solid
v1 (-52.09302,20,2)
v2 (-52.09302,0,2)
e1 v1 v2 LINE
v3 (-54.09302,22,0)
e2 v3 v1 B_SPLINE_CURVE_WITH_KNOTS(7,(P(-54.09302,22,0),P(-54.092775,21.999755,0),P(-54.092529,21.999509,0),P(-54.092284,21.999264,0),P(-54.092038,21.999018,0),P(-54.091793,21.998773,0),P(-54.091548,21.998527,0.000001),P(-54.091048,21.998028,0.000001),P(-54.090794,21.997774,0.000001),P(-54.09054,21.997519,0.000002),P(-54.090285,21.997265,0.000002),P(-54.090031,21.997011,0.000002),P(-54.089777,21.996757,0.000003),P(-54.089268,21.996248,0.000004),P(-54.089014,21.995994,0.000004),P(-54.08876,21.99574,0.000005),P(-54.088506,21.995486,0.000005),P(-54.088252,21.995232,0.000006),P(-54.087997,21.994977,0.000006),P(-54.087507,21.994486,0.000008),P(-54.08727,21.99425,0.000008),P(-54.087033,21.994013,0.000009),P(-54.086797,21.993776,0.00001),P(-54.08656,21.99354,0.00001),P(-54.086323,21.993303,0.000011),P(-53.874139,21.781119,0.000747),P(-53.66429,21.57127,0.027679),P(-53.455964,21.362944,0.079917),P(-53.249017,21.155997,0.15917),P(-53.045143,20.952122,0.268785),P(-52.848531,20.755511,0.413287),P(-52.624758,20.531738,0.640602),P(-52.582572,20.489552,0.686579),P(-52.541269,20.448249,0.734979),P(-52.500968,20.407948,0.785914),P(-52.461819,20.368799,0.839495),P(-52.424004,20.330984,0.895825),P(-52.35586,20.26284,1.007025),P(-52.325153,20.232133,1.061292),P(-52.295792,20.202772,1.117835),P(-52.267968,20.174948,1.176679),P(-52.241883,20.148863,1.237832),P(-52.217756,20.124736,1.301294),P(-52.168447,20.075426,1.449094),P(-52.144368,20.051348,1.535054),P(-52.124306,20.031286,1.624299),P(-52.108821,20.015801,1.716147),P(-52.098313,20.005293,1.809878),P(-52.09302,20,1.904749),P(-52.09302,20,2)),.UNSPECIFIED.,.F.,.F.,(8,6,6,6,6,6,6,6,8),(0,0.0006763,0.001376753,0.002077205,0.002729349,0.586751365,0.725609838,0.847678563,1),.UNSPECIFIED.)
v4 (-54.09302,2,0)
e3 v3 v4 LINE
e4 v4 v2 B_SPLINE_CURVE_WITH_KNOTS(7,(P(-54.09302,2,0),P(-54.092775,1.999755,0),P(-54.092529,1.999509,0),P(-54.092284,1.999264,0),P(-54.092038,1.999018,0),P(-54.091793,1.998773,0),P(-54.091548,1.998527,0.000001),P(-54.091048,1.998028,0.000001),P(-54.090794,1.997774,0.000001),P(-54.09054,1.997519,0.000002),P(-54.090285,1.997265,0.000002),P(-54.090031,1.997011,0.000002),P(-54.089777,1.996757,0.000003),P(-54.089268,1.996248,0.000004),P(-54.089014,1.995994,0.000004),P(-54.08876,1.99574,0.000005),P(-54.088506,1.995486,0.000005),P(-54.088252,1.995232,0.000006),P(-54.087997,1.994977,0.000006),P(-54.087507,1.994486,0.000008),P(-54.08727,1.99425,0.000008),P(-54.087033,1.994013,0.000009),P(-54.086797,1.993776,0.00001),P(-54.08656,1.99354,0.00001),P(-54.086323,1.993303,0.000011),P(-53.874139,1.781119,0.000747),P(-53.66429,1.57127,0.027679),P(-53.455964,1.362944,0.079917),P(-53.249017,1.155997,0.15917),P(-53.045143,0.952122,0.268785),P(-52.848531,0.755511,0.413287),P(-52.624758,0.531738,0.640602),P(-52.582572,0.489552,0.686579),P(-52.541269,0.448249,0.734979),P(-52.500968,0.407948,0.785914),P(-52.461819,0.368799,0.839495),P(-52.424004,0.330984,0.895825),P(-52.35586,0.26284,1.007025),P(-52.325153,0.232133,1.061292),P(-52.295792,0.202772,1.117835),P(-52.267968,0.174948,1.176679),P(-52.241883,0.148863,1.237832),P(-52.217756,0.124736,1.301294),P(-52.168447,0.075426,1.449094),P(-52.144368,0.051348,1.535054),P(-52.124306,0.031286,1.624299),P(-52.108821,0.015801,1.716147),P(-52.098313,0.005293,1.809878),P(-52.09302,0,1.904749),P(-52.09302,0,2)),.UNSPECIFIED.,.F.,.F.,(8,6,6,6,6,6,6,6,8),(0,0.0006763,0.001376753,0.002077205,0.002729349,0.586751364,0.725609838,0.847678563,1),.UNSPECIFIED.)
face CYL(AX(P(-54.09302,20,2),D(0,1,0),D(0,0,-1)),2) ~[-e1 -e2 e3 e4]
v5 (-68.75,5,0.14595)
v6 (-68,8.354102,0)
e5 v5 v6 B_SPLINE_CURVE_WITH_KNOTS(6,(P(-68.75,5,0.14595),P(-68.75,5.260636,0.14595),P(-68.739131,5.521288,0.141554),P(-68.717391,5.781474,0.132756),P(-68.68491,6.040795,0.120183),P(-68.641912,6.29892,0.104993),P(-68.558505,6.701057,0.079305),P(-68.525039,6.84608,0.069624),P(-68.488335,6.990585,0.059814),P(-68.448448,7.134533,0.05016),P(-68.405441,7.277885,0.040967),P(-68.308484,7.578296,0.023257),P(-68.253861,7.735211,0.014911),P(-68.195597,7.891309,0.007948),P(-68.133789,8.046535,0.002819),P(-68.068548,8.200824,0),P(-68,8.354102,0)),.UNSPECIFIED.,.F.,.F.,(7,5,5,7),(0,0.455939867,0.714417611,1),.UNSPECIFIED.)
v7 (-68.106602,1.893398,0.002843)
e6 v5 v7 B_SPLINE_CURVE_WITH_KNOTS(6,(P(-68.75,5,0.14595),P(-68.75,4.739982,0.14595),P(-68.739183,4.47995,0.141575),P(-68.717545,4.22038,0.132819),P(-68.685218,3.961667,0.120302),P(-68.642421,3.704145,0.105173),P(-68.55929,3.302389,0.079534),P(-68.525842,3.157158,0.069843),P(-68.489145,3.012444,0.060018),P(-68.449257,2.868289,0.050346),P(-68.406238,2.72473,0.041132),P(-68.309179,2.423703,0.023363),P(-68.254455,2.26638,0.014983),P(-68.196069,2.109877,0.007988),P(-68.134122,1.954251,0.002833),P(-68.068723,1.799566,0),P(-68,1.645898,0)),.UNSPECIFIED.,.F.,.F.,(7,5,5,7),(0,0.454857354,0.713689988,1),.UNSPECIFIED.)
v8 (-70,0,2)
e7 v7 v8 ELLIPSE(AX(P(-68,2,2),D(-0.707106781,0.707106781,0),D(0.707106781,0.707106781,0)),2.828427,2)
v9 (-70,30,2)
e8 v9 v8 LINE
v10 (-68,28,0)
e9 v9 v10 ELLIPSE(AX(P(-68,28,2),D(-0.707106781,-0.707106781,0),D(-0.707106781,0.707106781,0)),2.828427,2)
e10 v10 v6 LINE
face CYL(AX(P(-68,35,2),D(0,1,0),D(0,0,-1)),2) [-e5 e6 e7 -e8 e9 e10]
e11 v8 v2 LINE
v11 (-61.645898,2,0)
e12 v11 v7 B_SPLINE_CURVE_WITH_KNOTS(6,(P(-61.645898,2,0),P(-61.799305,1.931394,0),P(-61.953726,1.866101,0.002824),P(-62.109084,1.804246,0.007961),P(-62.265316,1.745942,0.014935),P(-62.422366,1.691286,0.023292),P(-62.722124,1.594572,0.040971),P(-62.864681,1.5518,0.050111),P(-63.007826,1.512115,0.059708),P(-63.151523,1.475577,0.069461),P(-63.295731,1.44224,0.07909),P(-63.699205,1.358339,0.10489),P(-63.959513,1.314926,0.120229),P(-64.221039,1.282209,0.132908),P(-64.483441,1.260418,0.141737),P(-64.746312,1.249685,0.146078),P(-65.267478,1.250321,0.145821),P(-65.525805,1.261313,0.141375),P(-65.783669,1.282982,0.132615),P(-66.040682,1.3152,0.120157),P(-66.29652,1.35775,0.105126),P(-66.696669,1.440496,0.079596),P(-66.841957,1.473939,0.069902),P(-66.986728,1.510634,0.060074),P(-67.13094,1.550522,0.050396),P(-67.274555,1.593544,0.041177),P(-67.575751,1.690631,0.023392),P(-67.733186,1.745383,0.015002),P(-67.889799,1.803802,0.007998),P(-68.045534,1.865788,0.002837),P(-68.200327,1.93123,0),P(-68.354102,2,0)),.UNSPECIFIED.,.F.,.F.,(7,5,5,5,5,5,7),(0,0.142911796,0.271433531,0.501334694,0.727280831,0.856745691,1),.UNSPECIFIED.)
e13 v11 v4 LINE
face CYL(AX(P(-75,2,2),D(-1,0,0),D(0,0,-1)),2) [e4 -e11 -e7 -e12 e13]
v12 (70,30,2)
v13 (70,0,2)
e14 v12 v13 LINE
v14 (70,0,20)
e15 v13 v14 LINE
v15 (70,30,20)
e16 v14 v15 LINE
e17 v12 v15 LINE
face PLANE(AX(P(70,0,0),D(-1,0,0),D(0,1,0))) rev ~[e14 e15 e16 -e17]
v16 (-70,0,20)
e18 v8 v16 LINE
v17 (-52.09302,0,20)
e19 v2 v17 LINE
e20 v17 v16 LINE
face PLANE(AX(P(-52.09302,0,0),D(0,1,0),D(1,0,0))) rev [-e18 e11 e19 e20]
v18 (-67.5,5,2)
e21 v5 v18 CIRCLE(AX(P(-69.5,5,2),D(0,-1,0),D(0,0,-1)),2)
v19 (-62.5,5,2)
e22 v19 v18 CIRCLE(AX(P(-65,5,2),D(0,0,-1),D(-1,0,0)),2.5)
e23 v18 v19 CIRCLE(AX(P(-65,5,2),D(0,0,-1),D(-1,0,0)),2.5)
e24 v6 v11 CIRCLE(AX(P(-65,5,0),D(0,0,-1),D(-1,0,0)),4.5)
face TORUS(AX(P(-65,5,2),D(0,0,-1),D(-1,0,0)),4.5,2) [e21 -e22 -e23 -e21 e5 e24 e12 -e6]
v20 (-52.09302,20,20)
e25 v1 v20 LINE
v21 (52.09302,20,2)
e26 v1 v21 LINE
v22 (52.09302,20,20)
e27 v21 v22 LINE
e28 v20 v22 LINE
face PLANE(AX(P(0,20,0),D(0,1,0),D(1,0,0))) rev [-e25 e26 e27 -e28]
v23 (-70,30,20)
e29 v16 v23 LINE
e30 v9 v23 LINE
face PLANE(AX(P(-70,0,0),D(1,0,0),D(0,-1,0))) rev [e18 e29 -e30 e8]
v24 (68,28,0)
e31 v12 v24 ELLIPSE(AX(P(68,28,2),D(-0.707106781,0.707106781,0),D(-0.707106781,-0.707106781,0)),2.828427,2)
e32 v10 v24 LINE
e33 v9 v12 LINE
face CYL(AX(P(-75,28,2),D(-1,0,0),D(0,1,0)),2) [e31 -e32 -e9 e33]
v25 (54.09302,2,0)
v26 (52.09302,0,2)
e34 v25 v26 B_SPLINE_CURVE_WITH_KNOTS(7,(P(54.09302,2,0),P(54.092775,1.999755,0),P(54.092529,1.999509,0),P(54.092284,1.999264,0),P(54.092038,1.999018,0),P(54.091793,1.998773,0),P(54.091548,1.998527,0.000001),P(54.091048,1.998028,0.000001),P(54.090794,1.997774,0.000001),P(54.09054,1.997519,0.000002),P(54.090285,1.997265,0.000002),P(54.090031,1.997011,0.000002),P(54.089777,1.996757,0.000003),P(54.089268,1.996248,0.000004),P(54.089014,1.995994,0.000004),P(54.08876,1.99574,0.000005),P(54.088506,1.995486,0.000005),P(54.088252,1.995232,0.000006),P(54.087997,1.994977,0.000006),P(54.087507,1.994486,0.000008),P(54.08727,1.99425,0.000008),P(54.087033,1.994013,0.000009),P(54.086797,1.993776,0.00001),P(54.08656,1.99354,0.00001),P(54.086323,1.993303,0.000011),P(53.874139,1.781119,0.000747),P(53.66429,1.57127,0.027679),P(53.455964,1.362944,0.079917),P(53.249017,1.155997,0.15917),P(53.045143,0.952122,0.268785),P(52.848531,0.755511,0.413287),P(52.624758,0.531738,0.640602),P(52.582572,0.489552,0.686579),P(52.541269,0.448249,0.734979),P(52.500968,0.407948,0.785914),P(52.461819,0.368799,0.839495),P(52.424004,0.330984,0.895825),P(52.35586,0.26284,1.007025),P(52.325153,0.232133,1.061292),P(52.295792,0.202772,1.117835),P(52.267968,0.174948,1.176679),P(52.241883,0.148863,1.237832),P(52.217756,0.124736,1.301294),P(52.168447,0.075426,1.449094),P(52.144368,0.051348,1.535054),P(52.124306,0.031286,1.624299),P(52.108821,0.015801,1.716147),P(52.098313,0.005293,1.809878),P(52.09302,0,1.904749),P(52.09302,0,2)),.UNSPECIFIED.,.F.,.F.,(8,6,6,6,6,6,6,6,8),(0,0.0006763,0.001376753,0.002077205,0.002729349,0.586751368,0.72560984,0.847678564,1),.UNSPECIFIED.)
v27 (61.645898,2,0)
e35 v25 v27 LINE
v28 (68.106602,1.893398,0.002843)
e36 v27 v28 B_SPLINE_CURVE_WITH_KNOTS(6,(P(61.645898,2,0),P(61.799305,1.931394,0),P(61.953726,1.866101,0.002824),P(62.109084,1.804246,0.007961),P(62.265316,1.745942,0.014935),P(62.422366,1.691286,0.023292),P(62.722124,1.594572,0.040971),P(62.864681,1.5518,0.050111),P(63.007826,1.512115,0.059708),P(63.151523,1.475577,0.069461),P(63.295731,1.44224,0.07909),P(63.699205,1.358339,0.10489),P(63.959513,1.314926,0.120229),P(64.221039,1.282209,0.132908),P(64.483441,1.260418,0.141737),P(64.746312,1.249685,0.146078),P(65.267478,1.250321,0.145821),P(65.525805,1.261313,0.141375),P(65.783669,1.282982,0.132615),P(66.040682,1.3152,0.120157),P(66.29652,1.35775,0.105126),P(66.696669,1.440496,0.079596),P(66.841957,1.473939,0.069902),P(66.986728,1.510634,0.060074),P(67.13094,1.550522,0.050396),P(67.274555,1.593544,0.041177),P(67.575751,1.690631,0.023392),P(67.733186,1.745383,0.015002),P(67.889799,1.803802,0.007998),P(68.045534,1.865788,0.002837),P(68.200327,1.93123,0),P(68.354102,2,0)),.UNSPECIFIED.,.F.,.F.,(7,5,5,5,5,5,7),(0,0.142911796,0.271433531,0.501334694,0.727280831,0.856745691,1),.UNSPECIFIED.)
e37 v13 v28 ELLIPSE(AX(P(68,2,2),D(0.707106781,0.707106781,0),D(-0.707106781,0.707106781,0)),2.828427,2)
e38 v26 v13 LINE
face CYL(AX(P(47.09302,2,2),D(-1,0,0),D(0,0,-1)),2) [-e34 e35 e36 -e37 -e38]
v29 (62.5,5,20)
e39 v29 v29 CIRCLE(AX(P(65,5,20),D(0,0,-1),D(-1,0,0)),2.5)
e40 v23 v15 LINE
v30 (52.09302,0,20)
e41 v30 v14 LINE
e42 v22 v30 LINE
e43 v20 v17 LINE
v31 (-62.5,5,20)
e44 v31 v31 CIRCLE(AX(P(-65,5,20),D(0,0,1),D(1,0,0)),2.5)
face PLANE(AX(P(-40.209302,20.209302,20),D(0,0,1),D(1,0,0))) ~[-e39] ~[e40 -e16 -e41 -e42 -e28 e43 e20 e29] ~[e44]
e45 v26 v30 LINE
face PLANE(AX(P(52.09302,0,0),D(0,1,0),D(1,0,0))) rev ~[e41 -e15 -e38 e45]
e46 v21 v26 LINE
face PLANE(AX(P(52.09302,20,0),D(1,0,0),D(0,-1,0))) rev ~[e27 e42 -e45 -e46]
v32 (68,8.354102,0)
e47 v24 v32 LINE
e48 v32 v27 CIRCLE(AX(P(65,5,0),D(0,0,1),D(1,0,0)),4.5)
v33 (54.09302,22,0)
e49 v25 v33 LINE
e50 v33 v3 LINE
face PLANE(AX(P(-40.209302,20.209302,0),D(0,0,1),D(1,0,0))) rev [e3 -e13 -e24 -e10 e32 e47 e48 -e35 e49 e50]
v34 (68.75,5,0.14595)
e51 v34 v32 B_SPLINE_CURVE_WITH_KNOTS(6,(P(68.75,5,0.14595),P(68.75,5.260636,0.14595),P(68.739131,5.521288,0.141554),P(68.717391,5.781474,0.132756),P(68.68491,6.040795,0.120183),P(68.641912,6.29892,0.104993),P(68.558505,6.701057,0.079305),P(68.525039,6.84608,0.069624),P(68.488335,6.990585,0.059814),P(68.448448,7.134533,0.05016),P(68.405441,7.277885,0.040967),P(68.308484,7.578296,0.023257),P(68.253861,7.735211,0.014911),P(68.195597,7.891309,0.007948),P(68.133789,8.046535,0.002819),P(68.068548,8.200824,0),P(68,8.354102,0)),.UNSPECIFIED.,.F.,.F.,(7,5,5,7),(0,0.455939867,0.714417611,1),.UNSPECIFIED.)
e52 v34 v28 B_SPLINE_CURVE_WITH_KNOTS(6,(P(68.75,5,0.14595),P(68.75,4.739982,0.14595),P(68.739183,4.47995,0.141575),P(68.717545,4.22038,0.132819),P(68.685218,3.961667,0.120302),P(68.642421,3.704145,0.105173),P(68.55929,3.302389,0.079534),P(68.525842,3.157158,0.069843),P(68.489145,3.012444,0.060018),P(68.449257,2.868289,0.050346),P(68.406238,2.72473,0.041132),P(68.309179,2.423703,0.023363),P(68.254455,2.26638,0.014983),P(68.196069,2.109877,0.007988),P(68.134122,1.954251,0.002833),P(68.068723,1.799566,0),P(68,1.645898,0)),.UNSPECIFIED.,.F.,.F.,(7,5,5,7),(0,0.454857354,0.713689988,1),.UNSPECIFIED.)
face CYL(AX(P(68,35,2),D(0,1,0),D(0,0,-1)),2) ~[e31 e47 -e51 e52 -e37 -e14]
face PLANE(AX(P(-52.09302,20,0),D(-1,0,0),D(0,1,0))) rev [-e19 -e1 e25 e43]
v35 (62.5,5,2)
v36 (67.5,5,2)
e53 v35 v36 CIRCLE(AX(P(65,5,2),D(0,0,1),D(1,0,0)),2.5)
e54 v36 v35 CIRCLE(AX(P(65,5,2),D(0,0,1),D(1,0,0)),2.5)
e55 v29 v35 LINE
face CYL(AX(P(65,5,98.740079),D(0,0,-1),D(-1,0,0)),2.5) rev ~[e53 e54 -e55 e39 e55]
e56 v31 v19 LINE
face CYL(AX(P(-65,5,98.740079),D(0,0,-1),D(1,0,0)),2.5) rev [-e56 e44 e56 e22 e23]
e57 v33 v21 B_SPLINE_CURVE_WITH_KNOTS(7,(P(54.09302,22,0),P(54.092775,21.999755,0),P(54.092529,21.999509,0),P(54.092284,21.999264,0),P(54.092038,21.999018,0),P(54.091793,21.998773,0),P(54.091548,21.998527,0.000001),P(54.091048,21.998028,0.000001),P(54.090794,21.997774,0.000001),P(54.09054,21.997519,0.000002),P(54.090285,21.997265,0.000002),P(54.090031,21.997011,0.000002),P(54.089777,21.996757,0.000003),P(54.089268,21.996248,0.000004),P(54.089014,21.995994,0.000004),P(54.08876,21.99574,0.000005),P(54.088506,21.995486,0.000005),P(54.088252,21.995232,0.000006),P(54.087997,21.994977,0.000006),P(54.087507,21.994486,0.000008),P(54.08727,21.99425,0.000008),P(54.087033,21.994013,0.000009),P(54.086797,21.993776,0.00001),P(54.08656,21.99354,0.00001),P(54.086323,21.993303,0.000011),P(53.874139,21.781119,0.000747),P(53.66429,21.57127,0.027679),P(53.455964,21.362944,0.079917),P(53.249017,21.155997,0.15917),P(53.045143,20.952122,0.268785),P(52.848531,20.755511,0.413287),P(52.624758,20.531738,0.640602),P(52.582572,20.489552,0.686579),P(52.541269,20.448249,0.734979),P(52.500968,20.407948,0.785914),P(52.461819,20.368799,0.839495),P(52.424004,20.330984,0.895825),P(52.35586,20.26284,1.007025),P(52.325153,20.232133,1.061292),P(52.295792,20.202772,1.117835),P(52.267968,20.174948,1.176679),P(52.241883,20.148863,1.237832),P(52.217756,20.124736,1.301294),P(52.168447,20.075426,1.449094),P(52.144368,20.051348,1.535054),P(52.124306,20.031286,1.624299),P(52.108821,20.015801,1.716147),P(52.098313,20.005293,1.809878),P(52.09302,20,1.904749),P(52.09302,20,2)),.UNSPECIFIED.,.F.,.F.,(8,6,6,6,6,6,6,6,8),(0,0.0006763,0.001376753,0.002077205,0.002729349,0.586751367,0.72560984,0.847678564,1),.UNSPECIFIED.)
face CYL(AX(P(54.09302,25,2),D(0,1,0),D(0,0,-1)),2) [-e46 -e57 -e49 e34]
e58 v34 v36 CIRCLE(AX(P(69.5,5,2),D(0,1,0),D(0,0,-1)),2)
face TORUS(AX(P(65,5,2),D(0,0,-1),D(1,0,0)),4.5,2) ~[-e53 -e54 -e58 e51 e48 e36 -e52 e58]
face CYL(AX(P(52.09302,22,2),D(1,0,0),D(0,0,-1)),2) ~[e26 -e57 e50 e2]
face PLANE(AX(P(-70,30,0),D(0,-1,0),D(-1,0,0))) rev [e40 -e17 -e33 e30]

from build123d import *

# Parameters (mm, degrees)
F1_DEPTH     = 20
F3_D         = 5
F5_T1_DEPTH  = 150
F5_T3_DEPTH  = 40
F5_T5_DEPTH  = 27.906979831
F5_T7_DEPTH  = 25
F5_T9_DEPTH  = 104.186040338
F5_T11_DEPTH = 27.906979831
F5_T21_DEPTH = 30
F5_T25_DEPTH = 109.186040338
F5_T32_DEPTH = 109.186040338
F5_T36_DEPTH = 30


# Not quite as in the source:
# - a fillet or chamfer that OpenCascade refuses, or shapes differently, is made with other operations: its cross-section is extruded or revolved along the edge and cut away or added


with BuildPart() as f1:
    # F0 (on Top) → F1 (new body)
    with BuildSketch(Plane.XY):
        Polygon((70, 30), (0, 30), (0, 20), (52.093020169, 20), (52.093020169, 0), (70, 0), align=None)
    extrude(amount=F1_DEPTH)

    # F3 (through all)
    with Locations(Plane.XY.offset(20)):
        with Locations((65, 5)):
            Hole(F3_D / 2)

    # F4: F1 across face


with BuildPart() as f1_1:
    add(f1.part)
    add(f1.part.mirror(Plane(origin=(0, 25, 10), x_dir=(0, -1, 0), z_dir=(-1, 0, 0))))

    # F5: fillet of radius 2 on 10 edges, made by hand

    # F5_s2 → F5_t1 (cut)
    with BuildSketch(Plane.YZ.offset(-75)):
        with BuildLine():
            ThreePointArc((30, 2), (29.4142135624, 0.5857864376), (28, 0))
            Line((28, 0), (30, 0))
            Line((30, 0), (30, 2))
        make_face()
    extrude(amount=F5_T1_DEPTH, mode=Mode.SUBTRACT)

    # F5_s4 → F5_t3 (cut)
    with BuildSketch(Plane.XZ.offset(-35)):
        with BuildLine():
            ThreePointArc((-68, 0), (-69.4142135624, 0.5857864376), (-70, 2))
            Line((-70, 2), (-70, 0))
            Line((-70, 0), (-68, 0))
        make_face()
        with BuildLine():
            ThreePointArc((68, 0), (69.4142135624, 0.5857864376), (70, 2))
            Line((70, 2), (70, 0))
            Line((70, 0), (68, 0))
        make_face()
    extrude(amount=F5_T3_DEPTH, mode=Mode.SUBTRACT)

    # F5_s6 → F5_t5 (cut)
    with BuildSketch(Plane.YZ.offset(-75)):
        with BuildLine():
            ThreePointArc((2, 0), (0.5857864376, 0.5857864376), (0, 2))
            Line((0, 2), (0, 0))
            Line((0, 0), (2, 0))
        make_face()
    extrude(amount=F5_T5_DEPTH, mode=Mode.SUBTRACT)

    # F5_s8 → F5_t7 (cut)
    with BuildSketch(Plane.XZ.offset(-20)):
        with BuildLine():
            ThreePointArc((-54.093020169, 0), (-52.6788066067, 0.5857864376), (-52.093020169, 2))
            Line((-52.093020169, 2), (-52.093020169, 0))
            Line((-52.093020169, 0), (-54.093020169, 0))
        make_face()
        with BuildLine():
            ThreePointArc((54.093020169, 0), (52.6788066067, 0.5857864376), (52.093020169, 2))
            Line((52.093020169, 2), (52.093020169, 0))
            Line((52.093020169, 0), (54.093020169, 0))
        make_face()
    extrude(amount=F5_T7_DEPTH, mode=Mode.SUBTRACT)

    # F5_s10 → F5_t9 (cut)
    with BuildSketch(Plane.YZ.offset(-52.093020169)):
        with BuildLine():
            ThreePointArc((22, 0), (20.5857864376, 0.5857864376), (20, 2))
            Line((20, 2), (20, 0))
            Line((20, 0), (22, 0))
        make_face()
    extrude(amount=F5_T9_DEPTH, mode=Mode.SUBTRACT)

    # F5_s12 → F5_t11 (cut)
    with BuildSketch(Plane.YZ.offset(47.093020169)):
        with BuildLine():
            ThreePointArc((2, 0), (0.5857864376, 0.5857864376), (0, 2))
            Line((0, 2), (0, 0))
            Line((0, 0), (2, 0))
        make_face()
    extrude(amount=F5_T11_DEPTH, mode=Mode.SUBTRACT)

    # F5_s13 → F5_t14 (revolve, cut)
    with BuildSketch(Plane.XZ.offset(-5)):
        with BuildLine():
            ThreePointArc((69.5, 0), (68.0857864376, 0.5857864376), (67.5, 2))
            Line((67.5, 2), (67.5, 0))
            Line((67.5, 0), (69.5, 0))
        make_face()
    revolve(axis=Axis((65, 5, 0), (0, 0, 1)), mode=Mode.SUBTRACT)

    # F5_s15 → F5_t16 (revolve, cut)
    with BuildSketch(Plane.XZ.offset(-5)):
        with BuildLine():
            ThreePointArc((-69.5, 0), (-68.0857864376, 0.5857864376), (-67.5, 2))
            Line((-67.5, 2), (-67.5, 0))
            Line((-67.5, 0), (-69.5, 0))
        make_face()
    revolve(axis=Axis((-65, 5, 0), (0, 0, -1)), mode=Mode.SUBTRACT)


with BuildPart() as f5_tool19:
    # F5_s20 → F5_t21 (new body)
    with BuildSketch(Plane.XZ.offset(-25)):
        with BuildLine():
            ThreePointArc((-54.093020169, 0), (-52.6788066067, 0.5857864376), (-52.093020169, 2))
            Line((-52.093020169, 2), (-52.093020169, 0))
            Line((-52.093020169, 0), (-54.093020169, 0))
        make_face()
    extrude(amount=F5_T21_DEPTH)

    split(bisect_by=Plane.XZ.offset(-20), keep=Keep.BOTTOM)


with BuildPart() as f5_tool23:
    # F5_s24 → F5_t25 (new body)
    with BuildSketch(Plane.YZ.offset(52.093020169)):
        with BuildLine():
            ThreePointArc((22, 0), (20.5857864376, 0.5857864376), (20, 2))
            Line((20, 2), (20, 0))
            Line((20, 0), (22, 0))
        make_face()
    extrude(amount=-F5_T25_DEPTH)

    split(bisect_by=Plane.YZ.offset(-52.093020169), keep=Keep.BOTTOM)


with BuildPart() as f5_tool19_1:
    add(f5_tool19.part)

    # F5_t27: intersect F5_tool23
    add(f5_tool23.part, mode=Mode.INTERSECT)


with BuildPart() as f1_2:
    add(f1_1.part)

    # F5_t17: cut F5_tool19
    add(f5_tool19_1.part, mode=Mode.SUBTRACT)


with BuildPart() as f5_tool30:
    # F5_s31 → F5_t32 (new body)
    with BuildSketch(Plane.YZ.offset(57.093020169)):
        with BuildLine():
            ThreePointArc((22, 0), (20.5857864376, 0.5857864376), (20, 2))
            Line((20, 2), (20, 0))
            Line((20, 0), (22, 0))
        make_face()
    extrude(amount=-F5_T32_DEPTH)

    split(bisect_by=Plane.YZ.offset(52.093020169), keep=Keep.TOP)


with BuildPart() as f5_tool34:
    # F5_s35 → F5_t36 (new body)
    with BuildSketch(Plane.XZ.offset(-25)):
        with BuildLine():
            ThreePointArc((54.093020169, 0), (52.6788066067, 0.5857864376), (52.093020169, 2))
            Line((52.093020169, 2), (52.093020169, 0))
            Line((52.093020169, 0), (54.093020169, 0))
        make_face()
    extrude(amount=F5_T36_DEPTH)

    split(bisect_by=Plane.XZ.offset(-20), keep=Keep.BOTTOM)


with BuildPart() as f5_tool30_1:
    add(f5_tool30.part)

    # F5_t38: intersect F5_tool34
    add(f5_tool34.part, mode=Mode.INTERSECT)


with BuildPart() as f1_3:
    add(f1_2.part)

    # F5_t28: cut F5_tool30
    add(f5_tool30_1.part, mode=Mode.SUBTRACT)


solid = f1_3.part
